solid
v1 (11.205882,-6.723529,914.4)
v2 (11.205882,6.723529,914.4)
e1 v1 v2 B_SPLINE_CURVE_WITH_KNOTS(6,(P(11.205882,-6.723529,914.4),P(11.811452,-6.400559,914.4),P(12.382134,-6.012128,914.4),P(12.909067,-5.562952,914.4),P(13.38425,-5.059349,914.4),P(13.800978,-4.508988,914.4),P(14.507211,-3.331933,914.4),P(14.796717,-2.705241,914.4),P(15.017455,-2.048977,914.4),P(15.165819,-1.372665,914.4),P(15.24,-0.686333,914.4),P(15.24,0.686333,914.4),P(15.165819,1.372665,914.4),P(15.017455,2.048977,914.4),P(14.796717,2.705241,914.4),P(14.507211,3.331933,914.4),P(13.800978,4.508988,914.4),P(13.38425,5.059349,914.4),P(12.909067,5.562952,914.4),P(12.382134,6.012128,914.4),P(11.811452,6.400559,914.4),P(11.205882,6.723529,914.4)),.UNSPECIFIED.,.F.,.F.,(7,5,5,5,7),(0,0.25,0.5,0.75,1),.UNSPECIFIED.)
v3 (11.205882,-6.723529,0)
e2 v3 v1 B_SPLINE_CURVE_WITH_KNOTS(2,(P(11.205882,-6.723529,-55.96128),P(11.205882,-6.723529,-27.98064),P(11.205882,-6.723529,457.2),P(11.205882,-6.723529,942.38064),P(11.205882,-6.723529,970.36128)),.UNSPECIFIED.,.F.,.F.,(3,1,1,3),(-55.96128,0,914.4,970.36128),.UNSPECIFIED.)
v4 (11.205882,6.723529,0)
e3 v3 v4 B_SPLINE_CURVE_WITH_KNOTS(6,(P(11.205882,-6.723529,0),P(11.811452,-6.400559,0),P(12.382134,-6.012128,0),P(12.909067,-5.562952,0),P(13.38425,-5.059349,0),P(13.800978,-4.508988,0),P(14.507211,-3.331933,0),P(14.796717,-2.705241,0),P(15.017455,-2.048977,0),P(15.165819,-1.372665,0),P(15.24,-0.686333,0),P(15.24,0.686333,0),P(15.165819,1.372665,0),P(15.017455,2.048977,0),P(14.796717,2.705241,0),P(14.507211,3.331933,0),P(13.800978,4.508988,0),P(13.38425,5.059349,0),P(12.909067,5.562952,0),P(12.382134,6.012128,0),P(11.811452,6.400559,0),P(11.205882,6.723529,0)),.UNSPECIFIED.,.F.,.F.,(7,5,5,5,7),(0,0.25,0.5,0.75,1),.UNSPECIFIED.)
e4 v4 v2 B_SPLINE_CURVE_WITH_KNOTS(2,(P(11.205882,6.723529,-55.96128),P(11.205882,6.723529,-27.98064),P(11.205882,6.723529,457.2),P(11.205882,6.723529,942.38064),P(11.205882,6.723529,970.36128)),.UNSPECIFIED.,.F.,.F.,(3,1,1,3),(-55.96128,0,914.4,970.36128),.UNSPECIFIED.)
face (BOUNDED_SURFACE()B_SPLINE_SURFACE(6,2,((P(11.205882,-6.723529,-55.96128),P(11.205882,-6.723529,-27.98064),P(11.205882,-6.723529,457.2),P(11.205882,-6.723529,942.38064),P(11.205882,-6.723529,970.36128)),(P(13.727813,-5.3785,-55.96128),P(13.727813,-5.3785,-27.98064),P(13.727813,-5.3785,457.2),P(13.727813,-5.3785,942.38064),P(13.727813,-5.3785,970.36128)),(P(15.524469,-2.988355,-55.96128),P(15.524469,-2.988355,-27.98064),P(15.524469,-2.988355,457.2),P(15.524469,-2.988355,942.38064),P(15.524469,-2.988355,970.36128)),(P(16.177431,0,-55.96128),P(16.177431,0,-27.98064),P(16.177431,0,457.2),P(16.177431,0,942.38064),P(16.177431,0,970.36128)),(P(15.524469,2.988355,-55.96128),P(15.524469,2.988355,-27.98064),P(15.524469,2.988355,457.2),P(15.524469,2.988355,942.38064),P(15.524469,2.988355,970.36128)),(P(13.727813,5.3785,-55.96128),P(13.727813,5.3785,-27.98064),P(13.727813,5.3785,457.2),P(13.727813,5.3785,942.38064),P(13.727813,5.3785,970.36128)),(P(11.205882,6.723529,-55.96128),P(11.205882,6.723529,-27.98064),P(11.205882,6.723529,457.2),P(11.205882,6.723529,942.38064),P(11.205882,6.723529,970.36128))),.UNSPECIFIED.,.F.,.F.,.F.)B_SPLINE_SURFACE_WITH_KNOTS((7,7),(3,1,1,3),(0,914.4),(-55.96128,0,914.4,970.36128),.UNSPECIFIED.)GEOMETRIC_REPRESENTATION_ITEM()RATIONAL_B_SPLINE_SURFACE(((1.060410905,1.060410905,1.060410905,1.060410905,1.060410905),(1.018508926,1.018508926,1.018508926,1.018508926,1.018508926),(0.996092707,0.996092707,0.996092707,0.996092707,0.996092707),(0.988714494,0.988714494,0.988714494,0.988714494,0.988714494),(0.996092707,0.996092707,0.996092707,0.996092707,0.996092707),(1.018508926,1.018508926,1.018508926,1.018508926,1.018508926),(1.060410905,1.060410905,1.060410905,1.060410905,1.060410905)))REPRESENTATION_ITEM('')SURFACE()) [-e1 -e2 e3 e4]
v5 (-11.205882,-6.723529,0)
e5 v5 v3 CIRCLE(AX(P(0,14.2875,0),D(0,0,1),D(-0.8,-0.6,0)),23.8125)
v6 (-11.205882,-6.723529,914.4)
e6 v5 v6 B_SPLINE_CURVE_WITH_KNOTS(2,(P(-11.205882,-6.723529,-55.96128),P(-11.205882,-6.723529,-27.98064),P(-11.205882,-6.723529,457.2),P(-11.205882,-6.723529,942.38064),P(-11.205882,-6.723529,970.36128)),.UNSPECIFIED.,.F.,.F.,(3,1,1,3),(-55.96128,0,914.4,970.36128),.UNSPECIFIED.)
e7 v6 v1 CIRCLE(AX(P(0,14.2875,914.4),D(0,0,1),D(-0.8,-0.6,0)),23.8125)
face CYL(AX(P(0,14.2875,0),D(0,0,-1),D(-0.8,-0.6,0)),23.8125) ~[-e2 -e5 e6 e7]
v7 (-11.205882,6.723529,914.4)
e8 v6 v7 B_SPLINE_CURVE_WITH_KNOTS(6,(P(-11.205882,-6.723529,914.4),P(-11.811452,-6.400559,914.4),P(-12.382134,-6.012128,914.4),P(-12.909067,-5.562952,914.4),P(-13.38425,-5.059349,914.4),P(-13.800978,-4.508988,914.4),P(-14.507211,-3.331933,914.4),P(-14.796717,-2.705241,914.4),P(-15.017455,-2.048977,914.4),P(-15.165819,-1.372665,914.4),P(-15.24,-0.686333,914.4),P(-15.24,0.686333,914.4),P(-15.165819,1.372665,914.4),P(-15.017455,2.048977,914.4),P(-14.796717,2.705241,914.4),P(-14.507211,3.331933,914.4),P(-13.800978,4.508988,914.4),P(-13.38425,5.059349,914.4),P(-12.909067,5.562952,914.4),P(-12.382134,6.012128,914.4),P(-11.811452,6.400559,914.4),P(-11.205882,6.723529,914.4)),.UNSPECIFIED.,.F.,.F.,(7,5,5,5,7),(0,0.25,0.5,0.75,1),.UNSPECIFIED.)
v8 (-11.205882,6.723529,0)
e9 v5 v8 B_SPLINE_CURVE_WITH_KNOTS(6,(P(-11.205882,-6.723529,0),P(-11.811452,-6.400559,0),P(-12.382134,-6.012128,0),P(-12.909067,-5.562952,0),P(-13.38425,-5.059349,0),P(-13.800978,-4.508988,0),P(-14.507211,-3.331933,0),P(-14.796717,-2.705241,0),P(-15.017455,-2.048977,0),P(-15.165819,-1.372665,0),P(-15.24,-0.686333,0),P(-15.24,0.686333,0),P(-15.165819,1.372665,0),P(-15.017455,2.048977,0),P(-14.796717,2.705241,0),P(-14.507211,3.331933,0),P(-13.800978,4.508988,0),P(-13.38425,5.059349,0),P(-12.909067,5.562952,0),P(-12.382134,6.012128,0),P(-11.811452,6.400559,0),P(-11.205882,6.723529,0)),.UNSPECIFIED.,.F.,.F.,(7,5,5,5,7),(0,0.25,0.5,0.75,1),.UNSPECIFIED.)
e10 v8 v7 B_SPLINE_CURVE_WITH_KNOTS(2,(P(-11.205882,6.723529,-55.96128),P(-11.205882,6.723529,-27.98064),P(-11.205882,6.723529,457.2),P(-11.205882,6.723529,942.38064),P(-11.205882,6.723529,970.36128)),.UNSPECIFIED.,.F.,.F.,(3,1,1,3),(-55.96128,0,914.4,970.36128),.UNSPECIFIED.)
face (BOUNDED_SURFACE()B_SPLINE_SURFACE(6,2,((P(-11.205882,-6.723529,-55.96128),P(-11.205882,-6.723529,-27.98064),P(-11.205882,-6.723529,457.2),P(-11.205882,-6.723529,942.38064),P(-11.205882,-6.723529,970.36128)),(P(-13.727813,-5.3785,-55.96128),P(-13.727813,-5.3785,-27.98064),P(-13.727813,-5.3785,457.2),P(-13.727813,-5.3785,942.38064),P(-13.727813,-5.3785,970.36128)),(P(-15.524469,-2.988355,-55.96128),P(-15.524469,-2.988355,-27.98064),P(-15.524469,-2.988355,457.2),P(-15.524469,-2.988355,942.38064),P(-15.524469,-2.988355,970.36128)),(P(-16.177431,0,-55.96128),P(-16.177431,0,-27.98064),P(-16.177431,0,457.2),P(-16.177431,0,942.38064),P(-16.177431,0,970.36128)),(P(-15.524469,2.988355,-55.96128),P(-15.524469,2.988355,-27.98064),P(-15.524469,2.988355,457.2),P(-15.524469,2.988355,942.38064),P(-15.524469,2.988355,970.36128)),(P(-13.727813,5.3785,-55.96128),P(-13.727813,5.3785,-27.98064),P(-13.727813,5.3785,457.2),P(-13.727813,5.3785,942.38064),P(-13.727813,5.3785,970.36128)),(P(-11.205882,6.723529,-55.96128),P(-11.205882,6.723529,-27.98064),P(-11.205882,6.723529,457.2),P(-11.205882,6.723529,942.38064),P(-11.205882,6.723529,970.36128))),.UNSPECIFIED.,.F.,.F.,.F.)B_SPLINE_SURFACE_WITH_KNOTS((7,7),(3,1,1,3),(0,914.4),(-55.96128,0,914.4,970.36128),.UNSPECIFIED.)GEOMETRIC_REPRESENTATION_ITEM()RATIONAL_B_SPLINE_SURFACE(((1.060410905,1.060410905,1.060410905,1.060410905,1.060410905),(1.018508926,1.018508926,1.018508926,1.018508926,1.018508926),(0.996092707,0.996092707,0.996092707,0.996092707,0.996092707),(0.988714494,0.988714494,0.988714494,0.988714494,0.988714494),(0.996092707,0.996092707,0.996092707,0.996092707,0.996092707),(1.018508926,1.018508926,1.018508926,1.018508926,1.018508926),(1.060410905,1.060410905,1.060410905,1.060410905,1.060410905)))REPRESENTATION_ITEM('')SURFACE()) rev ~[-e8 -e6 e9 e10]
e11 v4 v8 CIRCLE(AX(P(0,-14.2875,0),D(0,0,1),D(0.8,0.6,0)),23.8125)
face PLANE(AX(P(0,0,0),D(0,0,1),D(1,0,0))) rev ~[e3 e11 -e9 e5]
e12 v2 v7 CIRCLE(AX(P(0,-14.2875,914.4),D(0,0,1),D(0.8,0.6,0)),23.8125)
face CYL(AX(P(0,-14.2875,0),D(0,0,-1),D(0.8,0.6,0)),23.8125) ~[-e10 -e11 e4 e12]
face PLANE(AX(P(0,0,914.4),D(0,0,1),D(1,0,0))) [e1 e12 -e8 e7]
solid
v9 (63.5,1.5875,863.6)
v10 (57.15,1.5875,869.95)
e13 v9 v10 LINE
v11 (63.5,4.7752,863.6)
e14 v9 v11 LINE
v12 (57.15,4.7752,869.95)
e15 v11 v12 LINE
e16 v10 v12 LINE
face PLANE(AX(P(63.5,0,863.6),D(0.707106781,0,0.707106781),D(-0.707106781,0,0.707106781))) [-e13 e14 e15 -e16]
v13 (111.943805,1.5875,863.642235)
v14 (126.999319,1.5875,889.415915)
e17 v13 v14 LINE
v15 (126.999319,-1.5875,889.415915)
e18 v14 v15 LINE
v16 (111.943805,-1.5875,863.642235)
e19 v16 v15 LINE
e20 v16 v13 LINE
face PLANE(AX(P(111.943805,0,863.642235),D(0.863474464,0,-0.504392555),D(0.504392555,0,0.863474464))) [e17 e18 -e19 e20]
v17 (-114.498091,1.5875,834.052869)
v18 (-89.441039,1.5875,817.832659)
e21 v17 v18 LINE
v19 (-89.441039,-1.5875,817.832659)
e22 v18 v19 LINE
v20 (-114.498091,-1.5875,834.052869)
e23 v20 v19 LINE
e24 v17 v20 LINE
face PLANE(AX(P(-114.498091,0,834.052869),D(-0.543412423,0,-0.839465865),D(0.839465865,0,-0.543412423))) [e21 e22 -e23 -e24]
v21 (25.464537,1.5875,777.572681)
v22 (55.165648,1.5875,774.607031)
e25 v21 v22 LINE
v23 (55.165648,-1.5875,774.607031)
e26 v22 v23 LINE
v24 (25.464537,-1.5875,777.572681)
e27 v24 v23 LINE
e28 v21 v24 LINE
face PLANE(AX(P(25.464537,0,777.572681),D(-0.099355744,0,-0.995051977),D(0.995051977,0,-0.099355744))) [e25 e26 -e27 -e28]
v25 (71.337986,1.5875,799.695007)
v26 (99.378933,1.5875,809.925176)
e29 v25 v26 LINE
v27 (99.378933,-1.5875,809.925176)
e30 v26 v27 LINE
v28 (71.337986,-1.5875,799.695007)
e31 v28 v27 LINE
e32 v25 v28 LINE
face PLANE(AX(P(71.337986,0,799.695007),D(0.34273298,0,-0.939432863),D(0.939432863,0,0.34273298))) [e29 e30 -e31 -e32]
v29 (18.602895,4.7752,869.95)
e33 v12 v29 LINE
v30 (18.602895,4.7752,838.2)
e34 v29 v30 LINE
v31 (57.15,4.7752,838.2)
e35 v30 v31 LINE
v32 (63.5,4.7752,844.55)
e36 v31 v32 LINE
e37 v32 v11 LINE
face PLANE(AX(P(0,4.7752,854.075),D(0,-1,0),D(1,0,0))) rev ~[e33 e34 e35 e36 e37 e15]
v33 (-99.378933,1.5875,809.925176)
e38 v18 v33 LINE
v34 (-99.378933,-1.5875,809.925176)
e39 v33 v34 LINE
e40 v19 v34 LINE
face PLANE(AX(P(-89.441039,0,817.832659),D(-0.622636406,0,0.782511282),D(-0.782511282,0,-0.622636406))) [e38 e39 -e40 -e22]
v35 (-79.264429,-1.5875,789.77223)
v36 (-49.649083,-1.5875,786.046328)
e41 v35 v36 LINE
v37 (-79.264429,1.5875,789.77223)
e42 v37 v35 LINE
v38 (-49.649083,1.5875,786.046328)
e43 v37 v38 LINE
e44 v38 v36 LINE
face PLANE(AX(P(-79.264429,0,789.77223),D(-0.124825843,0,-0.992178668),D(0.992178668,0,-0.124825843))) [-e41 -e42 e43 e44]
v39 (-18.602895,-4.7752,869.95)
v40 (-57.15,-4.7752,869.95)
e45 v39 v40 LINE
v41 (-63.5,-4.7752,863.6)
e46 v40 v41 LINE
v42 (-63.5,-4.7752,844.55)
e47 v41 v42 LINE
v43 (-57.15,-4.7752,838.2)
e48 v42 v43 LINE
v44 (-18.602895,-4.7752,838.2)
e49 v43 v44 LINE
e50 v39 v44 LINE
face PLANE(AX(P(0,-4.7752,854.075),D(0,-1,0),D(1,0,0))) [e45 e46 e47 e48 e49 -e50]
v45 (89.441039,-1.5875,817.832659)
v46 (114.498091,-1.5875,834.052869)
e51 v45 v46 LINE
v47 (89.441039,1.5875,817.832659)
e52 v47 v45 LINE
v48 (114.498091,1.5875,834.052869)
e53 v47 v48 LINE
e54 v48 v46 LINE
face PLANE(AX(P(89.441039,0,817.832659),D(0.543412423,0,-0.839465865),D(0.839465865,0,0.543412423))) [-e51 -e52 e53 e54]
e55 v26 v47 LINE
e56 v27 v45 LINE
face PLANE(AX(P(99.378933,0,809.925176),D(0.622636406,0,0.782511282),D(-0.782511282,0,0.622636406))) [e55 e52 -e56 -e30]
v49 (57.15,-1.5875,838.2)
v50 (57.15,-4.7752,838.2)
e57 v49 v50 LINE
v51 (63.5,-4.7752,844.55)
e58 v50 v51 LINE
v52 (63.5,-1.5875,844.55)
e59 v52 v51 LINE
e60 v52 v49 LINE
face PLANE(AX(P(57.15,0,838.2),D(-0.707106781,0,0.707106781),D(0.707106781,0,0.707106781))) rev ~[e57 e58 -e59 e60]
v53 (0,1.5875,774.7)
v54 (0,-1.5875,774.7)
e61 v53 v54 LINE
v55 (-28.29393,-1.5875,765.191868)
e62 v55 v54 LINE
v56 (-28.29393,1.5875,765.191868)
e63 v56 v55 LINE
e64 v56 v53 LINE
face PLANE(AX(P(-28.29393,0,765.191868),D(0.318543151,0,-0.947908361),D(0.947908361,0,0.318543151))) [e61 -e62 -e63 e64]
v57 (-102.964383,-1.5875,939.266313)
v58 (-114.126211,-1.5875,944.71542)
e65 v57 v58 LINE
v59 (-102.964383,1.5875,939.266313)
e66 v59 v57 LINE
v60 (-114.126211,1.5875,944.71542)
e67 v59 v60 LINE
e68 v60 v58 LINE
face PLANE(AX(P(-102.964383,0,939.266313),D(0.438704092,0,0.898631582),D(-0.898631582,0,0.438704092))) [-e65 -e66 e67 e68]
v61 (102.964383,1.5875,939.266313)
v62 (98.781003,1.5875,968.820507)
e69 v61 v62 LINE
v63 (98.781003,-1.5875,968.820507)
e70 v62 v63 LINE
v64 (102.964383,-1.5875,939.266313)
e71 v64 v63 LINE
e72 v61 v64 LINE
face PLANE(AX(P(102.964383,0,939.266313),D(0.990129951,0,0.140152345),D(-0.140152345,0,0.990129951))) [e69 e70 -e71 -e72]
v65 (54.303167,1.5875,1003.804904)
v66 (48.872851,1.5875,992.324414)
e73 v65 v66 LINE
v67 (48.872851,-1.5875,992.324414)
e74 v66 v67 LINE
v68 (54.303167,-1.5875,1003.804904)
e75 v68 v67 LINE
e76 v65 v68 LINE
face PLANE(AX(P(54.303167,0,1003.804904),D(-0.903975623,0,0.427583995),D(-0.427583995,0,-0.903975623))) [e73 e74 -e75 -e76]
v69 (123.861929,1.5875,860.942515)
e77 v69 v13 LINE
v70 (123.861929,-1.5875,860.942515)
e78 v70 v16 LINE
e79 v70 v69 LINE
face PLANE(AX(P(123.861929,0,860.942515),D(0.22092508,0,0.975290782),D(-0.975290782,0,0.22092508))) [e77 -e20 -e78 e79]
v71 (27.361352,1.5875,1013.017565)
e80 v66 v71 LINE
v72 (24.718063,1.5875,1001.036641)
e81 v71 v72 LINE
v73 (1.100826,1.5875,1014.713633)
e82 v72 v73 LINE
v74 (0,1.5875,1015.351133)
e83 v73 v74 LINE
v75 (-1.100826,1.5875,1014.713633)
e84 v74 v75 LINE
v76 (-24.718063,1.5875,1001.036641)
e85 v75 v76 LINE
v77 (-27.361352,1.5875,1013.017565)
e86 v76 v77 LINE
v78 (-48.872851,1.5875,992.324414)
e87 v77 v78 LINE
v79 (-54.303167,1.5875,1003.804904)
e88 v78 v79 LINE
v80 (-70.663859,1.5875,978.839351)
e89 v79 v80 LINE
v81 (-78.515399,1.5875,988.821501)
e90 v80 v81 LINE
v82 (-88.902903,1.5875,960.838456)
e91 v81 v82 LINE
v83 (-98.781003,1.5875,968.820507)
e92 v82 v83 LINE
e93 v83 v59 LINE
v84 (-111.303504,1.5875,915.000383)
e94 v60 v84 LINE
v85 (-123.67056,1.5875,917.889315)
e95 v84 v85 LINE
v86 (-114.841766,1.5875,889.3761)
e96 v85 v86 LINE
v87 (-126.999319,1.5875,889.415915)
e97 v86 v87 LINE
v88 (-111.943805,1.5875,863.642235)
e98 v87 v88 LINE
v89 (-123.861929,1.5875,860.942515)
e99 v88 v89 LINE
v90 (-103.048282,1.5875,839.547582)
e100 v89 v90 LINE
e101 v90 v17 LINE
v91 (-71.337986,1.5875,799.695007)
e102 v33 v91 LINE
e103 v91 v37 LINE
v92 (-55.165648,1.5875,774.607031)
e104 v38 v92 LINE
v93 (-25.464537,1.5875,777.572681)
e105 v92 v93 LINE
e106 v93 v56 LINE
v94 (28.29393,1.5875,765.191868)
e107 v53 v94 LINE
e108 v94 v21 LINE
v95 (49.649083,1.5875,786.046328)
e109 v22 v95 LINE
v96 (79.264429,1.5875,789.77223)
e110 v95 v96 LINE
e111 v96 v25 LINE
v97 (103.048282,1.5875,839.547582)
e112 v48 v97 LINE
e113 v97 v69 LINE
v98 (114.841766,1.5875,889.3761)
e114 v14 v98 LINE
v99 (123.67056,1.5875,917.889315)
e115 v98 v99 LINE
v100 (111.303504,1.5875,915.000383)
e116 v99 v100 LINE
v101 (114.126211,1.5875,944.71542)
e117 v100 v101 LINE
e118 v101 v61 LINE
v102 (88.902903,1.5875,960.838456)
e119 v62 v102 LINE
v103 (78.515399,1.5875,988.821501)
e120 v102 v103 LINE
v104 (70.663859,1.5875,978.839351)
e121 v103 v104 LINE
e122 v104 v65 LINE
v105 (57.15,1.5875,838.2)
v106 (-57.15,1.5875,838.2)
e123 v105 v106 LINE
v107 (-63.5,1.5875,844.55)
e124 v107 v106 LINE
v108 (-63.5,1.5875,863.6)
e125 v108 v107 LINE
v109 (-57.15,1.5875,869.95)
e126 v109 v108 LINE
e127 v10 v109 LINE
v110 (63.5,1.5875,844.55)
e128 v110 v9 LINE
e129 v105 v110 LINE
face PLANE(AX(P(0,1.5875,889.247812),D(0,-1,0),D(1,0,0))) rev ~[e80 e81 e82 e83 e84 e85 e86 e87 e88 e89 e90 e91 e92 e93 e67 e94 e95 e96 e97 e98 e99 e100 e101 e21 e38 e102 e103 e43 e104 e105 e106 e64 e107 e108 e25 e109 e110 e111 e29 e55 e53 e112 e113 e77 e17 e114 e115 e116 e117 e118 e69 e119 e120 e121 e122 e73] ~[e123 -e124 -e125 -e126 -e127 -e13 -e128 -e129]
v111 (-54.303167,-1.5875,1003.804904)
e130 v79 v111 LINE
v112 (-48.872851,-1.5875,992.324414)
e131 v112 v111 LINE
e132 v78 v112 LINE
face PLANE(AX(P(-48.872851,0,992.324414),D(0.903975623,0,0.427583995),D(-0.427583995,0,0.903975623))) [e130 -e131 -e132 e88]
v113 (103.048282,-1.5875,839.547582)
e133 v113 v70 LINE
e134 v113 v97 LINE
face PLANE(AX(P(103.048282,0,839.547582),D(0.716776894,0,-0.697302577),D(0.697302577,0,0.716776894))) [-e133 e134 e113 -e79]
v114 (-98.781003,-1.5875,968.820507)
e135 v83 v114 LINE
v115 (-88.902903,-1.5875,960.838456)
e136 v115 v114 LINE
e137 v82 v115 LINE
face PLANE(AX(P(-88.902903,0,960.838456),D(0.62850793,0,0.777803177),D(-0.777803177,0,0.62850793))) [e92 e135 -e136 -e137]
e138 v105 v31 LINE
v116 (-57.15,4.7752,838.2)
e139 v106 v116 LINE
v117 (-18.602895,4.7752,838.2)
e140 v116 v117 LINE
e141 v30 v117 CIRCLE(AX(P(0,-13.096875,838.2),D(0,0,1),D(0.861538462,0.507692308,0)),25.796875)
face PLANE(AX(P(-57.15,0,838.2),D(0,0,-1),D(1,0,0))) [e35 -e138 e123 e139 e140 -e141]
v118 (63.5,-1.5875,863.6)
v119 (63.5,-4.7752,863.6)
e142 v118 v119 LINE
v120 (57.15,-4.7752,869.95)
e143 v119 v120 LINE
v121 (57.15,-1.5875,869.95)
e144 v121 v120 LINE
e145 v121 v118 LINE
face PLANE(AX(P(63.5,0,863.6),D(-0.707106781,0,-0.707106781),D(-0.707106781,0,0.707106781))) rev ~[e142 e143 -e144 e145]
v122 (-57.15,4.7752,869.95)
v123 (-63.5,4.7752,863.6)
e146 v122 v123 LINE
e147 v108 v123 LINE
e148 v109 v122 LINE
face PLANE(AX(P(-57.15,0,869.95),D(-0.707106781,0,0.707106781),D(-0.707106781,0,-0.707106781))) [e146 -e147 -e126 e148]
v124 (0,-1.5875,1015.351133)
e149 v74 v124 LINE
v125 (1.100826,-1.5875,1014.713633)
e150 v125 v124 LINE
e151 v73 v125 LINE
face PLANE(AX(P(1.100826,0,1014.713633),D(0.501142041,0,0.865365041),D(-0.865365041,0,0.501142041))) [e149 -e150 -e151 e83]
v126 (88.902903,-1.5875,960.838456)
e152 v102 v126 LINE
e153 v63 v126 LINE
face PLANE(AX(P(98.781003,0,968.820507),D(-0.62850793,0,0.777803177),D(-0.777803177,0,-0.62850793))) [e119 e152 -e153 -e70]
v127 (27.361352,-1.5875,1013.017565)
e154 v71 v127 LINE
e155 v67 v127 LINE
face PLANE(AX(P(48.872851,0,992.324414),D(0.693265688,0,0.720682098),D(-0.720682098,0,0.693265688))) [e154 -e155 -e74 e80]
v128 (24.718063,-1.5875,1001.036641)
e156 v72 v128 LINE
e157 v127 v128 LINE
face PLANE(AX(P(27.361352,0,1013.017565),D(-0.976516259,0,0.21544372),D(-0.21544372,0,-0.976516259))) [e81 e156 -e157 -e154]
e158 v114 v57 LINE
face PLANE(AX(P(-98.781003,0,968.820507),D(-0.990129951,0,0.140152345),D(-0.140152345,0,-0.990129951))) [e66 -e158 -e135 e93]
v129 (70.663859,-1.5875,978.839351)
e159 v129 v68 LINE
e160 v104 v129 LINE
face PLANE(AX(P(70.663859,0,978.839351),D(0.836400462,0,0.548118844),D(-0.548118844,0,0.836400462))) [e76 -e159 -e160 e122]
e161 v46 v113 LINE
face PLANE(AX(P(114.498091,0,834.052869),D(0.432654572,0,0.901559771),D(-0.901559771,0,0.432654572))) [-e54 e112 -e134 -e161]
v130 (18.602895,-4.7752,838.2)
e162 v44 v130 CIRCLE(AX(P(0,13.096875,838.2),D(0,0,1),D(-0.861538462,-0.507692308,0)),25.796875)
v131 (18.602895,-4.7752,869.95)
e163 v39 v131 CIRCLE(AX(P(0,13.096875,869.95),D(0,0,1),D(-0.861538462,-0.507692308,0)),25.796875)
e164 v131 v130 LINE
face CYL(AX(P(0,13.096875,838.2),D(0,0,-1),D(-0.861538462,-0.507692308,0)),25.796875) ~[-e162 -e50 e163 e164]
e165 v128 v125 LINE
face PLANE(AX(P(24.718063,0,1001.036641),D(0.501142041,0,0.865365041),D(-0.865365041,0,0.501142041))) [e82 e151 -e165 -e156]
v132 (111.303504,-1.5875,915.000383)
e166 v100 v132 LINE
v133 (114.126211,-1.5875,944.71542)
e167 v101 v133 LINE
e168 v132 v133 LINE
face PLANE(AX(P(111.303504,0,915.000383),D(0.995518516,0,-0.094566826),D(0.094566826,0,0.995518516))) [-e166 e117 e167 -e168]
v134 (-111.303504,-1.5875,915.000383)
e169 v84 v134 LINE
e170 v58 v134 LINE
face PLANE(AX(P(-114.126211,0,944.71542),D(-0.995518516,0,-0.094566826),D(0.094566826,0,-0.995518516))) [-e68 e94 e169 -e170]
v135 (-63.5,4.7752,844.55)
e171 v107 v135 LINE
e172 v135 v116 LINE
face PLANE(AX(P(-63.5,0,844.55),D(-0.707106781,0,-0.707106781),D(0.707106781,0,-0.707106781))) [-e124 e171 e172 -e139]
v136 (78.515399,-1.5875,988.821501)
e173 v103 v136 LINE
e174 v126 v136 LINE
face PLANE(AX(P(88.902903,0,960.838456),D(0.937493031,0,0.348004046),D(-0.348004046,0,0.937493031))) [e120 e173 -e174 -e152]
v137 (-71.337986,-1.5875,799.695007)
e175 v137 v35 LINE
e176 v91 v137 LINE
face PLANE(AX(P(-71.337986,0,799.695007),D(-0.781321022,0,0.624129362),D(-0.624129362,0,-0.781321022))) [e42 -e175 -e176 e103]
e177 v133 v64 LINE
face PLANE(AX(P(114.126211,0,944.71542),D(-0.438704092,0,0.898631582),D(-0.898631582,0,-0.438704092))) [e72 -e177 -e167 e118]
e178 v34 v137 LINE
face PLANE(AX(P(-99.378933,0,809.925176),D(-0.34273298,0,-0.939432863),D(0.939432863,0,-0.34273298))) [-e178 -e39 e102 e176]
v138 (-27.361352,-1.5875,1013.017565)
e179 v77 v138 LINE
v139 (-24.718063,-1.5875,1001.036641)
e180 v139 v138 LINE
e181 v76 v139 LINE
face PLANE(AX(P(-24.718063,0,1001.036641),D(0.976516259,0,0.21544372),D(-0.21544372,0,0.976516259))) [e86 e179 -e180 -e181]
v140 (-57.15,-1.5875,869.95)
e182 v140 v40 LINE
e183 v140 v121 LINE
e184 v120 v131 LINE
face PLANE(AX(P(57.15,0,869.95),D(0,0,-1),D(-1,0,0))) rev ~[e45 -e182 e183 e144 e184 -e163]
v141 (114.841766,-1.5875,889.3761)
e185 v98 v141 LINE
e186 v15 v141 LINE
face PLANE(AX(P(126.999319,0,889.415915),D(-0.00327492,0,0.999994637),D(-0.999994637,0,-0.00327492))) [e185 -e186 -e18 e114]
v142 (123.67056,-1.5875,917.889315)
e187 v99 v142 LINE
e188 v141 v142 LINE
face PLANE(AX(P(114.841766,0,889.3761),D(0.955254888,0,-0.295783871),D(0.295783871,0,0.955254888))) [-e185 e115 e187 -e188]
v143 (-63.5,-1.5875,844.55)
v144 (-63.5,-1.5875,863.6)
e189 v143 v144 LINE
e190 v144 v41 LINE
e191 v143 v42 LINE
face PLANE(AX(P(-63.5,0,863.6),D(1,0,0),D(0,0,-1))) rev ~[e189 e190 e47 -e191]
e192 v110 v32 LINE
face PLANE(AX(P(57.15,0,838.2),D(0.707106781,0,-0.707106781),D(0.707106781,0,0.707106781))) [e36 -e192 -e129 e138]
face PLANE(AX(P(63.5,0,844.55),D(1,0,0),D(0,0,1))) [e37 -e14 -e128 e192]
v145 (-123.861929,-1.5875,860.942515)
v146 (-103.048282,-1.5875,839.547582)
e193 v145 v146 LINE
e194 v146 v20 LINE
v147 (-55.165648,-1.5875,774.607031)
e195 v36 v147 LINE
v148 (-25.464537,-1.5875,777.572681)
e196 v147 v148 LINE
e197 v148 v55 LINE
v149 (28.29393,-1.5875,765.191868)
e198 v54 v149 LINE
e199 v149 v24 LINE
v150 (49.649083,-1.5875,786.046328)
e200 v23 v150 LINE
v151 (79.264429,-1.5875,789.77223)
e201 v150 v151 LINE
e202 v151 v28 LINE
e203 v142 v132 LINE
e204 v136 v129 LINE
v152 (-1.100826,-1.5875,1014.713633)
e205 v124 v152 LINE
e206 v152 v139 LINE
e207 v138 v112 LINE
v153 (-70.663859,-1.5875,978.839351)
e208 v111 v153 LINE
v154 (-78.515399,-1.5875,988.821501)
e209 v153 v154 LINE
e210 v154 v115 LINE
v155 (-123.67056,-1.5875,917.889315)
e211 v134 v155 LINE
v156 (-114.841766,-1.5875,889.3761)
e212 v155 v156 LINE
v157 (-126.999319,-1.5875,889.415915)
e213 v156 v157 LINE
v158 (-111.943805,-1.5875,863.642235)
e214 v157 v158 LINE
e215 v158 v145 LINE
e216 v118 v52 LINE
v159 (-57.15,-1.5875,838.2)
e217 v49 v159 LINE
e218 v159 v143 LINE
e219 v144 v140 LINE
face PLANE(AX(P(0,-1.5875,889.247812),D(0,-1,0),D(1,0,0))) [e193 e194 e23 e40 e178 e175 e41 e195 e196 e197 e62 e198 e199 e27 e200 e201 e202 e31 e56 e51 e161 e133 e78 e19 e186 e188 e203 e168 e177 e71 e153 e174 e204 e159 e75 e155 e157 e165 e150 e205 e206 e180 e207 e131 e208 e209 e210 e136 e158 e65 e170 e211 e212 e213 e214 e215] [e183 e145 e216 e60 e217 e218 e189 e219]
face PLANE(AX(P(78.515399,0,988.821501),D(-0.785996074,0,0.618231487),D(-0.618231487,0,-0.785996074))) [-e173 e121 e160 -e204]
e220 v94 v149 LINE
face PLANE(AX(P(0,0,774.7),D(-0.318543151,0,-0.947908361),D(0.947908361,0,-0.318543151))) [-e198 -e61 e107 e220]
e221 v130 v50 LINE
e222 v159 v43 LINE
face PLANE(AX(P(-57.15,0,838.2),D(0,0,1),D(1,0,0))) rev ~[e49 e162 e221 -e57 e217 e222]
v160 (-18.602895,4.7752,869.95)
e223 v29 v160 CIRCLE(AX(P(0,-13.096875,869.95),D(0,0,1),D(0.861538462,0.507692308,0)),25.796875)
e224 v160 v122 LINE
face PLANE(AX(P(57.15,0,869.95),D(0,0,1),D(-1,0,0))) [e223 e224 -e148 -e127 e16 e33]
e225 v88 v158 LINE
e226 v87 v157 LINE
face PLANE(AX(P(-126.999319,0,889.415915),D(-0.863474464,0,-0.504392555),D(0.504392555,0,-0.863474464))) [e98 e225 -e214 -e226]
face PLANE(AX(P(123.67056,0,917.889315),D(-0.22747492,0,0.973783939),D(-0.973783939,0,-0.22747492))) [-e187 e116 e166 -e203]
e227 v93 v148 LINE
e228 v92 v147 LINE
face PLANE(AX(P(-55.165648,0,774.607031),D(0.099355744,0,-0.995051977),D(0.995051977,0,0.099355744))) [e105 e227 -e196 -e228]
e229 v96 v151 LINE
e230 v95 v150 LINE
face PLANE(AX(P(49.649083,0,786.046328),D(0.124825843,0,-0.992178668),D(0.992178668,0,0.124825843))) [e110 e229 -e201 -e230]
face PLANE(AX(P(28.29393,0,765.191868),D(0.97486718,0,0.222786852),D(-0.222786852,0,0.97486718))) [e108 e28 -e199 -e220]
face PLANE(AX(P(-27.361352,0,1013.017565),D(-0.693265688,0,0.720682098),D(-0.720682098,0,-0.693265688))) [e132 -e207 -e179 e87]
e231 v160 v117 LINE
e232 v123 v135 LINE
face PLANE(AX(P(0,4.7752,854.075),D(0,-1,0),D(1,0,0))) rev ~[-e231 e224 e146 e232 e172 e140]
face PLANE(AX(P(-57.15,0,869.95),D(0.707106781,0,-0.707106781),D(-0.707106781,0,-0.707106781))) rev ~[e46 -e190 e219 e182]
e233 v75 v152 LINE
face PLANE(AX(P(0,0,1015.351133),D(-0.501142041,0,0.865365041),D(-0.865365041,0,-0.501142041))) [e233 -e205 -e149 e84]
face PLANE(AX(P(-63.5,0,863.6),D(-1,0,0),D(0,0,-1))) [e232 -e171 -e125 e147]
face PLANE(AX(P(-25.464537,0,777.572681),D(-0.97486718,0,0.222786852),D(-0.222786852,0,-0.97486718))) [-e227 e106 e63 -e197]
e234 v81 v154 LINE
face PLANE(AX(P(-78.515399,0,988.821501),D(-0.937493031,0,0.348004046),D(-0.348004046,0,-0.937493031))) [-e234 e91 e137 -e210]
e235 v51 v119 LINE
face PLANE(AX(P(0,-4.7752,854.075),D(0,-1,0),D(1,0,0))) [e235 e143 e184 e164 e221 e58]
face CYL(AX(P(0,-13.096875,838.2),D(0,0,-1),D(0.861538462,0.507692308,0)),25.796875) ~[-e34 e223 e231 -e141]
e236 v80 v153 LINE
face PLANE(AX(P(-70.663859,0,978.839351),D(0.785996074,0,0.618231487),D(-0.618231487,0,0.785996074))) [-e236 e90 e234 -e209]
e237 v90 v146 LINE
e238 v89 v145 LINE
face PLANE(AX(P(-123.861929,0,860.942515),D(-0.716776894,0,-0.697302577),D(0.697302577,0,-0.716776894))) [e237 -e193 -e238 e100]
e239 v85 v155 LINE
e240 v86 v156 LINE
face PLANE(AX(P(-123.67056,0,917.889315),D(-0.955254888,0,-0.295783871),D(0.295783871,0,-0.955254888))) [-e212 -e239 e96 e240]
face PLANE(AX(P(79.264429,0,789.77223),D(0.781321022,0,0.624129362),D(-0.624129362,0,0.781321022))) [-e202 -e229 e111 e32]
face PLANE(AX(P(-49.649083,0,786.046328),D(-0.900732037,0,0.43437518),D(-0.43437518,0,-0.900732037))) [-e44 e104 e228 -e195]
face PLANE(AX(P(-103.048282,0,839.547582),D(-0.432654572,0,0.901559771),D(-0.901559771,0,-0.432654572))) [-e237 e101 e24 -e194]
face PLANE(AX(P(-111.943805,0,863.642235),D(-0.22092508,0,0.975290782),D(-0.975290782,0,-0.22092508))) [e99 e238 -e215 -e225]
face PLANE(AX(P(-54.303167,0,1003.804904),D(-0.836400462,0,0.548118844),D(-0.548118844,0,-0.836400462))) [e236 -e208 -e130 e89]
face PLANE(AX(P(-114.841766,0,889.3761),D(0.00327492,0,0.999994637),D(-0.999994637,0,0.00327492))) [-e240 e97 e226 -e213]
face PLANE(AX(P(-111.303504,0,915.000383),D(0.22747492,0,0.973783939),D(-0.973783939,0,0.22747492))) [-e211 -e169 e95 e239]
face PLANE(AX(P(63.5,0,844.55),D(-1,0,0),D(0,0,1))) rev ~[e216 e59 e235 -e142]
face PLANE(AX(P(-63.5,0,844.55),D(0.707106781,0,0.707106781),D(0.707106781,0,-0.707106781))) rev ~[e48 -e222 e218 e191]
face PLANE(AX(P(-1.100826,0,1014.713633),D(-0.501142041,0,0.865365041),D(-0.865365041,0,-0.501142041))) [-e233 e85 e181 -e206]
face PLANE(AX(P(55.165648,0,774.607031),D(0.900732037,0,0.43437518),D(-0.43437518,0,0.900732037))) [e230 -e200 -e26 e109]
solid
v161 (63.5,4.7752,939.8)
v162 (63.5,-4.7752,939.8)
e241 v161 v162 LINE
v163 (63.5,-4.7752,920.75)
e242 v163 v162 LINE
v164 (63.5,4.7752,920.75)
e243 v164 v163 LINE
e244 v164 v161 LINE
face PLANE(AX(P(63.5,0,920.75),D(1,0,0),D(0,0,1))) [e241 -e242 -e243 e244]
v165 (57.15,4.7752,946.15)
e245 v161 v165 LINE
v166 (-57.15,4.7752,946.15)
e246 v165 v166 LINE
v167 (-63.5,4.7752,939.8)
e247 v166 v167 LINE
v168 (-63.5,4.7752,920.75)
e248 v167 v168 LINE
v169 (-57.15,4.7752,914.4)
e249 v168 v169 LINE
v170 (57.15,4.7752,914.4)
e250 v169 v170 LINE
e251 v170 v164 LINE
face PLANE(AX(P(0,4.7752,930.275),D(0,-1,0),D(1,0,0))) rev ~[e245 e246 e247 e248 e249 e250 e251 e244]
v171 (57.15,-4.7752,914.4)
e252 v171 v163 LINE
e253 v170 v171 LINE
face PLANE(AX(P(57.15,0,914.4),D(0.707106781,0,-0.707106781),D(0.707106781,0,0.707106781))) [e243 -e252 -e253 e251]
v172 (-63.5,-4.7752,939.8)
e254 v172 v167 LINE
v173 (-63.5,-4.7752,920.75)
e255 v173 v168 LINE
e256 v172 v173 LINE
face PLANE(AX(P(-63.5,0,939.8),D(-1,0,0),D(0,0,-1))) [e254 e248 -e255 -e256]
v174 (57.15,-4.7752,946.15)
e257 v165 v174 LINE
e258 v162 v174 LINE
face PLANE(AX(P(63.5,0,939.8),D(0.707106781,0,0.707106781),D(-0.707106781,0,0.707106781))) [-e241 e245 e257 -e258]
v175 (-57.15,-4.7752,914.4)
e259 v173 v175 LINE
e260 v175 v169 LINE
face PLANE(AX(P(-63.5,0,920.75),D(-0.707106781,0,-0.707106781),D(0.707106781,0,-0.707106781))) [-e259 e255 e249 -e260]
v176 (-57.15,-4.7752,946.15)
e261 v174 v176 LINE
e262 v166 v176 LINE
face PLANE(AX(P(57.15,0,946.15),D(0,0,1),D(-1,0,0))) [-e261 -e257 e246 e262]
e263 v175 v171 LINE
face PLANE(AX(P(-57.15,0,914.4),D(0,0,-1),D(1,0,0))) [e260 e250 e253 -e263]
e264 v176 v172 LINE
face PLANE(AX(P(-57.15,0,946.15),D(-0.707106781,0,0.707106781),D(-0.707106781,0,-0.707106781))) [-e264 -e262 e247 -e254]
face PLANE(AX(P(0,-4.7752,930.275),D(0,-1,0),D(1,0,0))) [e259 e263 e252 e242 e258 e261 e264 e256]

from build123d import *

# Parameters (mm, degrees)
F1_DEPTH      = 914.4
F3_DEPTH      = 1.5875
F3_DEPTH_BACK = 1.5875
F5_DEPTH      = 4.7752
F5_DEPTH_BACK = 4.7752
F7_DEPTH      = 4.7752
F7_DEPTH_BACK = 4.7752
F9_START      = 838.2
F9_DEPTH      = 31.75
F10_R         = 7.62


with BuildPart() as f1:
    # F0 (on Top) → F1 (new body)
    with BuildSketch(Plane.XY):
        with BuildLine():
            ThreePointArc((-19.05, 0), (0, -9.525), (19.05, 0))
            ThreePointArc((19.05, 0), (0, 9.525), (-19.05, 0))
        make_face()
    extrude(amount=F1_DEPTH)

    # F10
    f10_edges = [f1.edges().sort_by_distance(p)[0] for p in [
        (19.05, 0, 457.2),
        (-19.05, 0, 457.2),
    ]]
    fillet(f10_edges, radius=F10_R)


with BuildPart() as f3:
    # F2 (on Front) → F3 (new body, two sides)
    with BuildSketch(Plane.XZ) as f3_sk:
        Polygon((111.9438048034, 863.6422354789), (126.9993189541, 889.4159148914), (114.8417657116, 889.3760996587), (123.6705603008, 917.8893148914), (111.3035042707, 915.0003834023), (114.1262108525, 944.7154197367), (102.9643832521, 939.2663129528), (98.7810034847, 968.8205070803), (88.9029031363, 960.8384563722), (78.515398819, 988.8215014328), (70.6638589371, 978.8393512895), (54.3031673817, 1003.8049041301), (48.8728506435, 992.3244137171), (27.361352482, 1013.0175648461), (24.7180633611, 1001.0366410167), (1.1008259294, 1014.7136328074), (0, 1015.351132737), (-1.1008259294, 1014.7136328074), (-24.7180633611, 1001.0366410167), (-27.361352482, 1013.0175648461), (-48.8728506435, 992.3244137171), (-54.3031673817, 1003.8049041301), (-70.6638589371, 978.8393512895), (-78.515398819, 988.8215014328), (-88.9029031363, 960.8384563722), (-98.7810034847, 968.8205070803), (-102.9643832521, 939.2663129528), (-114.1262108525, 944.7154197367), (-111.3035042707, 915.0003834023), (-123.6705603008, 917.8893148914), (-114.8417657116, 889.3760996587), (-126.9993189541, 889.4159148914), (-111.9438048034, 863.6422354789), (-123.8619292978, 860.9425148914), (-103.0482818511, 839.5475823894), (-114.4980909457, 834.0528693216), (-89.441039496, 817.8326587972), (-99.3789327734, 809.9251764414), (-71.3379860484, 799.6950071577), (-79.2644289427, 789.7722301753), (-49.6490830757, 786.0463281386), (-55.1656478619, 774.6070312651), (-25.4645371669, 777.572681326), (-28.2939301854, 765.19186814), (0, 774.7), (28.2939301854, 765.19186814), (25.4645371669, 777.572681326), (55.1656478619, 774.6070312651), (49.6490830757, 786.0463281386), (79.2644289427, 789.7722301753), (71.3379860484, 799.6950071577), (99.3789327734, 809.9251764414), (89.441039496, 817.8326587972), (114.4980909457, 834.0528693216), (103.0482818511, 839.5475823894), (123.8619292978, 860.9425148914), align=None)
    extrude(amount=F3_DEPTH)
    extrude(f3_sk.sketch, amount=-F3_DEPTH_BACK)

    # F6 (on Front) → F7 (join, two sides)
    with BuildSketch(Plane.XZ) as f7_sk:
        Polygon((-57.15, 838.2), (57.15, 838.2), (63.5, 844.55), (63.5, 863.6), (57.15, 869.95), (-57.15, 869.95), (-63.5, 863.6), (-63.5, 844.55), align=None)
    extrude(amount=F7_DEPTH)
    extrude(f7_sk.sketch, amount=-F7_DEPTH_BACK)

    # F8 (on Top) → F9 (join)
    with BuildSketch(Plane.XY.offset(F9_START)):
        with BuildLine():
            ThreePointArc((-22.225, 0), (0, -12.7), (22.225, 0))
            ThreePointArc((22.225, 0), (0, 12.7), (-22.225, 0))
        make_face()
    extrude(amount=F9_DEPTH)


with BuildPart() as f5:
    # F4 (on Front) → F5 (new body, two sides)
    with BuildSketch(Plane.XZ) as f5_sk:
        Polygon((-57.15, 914.4), (57.15, 914.4), (63.5, 920.75), (63.5, 939.8), (57.15, 946.15), (-57.15, 946.15), (-63.5, 939.8), (-63.5, 920.75), align=None)
    extrude(amount=F5_DEPTH)
    extrude(f5_sk.sketch, amount=-F5_DEPTH_BACK)


solid = Compound([f1.part, f3.part, f5.part])
